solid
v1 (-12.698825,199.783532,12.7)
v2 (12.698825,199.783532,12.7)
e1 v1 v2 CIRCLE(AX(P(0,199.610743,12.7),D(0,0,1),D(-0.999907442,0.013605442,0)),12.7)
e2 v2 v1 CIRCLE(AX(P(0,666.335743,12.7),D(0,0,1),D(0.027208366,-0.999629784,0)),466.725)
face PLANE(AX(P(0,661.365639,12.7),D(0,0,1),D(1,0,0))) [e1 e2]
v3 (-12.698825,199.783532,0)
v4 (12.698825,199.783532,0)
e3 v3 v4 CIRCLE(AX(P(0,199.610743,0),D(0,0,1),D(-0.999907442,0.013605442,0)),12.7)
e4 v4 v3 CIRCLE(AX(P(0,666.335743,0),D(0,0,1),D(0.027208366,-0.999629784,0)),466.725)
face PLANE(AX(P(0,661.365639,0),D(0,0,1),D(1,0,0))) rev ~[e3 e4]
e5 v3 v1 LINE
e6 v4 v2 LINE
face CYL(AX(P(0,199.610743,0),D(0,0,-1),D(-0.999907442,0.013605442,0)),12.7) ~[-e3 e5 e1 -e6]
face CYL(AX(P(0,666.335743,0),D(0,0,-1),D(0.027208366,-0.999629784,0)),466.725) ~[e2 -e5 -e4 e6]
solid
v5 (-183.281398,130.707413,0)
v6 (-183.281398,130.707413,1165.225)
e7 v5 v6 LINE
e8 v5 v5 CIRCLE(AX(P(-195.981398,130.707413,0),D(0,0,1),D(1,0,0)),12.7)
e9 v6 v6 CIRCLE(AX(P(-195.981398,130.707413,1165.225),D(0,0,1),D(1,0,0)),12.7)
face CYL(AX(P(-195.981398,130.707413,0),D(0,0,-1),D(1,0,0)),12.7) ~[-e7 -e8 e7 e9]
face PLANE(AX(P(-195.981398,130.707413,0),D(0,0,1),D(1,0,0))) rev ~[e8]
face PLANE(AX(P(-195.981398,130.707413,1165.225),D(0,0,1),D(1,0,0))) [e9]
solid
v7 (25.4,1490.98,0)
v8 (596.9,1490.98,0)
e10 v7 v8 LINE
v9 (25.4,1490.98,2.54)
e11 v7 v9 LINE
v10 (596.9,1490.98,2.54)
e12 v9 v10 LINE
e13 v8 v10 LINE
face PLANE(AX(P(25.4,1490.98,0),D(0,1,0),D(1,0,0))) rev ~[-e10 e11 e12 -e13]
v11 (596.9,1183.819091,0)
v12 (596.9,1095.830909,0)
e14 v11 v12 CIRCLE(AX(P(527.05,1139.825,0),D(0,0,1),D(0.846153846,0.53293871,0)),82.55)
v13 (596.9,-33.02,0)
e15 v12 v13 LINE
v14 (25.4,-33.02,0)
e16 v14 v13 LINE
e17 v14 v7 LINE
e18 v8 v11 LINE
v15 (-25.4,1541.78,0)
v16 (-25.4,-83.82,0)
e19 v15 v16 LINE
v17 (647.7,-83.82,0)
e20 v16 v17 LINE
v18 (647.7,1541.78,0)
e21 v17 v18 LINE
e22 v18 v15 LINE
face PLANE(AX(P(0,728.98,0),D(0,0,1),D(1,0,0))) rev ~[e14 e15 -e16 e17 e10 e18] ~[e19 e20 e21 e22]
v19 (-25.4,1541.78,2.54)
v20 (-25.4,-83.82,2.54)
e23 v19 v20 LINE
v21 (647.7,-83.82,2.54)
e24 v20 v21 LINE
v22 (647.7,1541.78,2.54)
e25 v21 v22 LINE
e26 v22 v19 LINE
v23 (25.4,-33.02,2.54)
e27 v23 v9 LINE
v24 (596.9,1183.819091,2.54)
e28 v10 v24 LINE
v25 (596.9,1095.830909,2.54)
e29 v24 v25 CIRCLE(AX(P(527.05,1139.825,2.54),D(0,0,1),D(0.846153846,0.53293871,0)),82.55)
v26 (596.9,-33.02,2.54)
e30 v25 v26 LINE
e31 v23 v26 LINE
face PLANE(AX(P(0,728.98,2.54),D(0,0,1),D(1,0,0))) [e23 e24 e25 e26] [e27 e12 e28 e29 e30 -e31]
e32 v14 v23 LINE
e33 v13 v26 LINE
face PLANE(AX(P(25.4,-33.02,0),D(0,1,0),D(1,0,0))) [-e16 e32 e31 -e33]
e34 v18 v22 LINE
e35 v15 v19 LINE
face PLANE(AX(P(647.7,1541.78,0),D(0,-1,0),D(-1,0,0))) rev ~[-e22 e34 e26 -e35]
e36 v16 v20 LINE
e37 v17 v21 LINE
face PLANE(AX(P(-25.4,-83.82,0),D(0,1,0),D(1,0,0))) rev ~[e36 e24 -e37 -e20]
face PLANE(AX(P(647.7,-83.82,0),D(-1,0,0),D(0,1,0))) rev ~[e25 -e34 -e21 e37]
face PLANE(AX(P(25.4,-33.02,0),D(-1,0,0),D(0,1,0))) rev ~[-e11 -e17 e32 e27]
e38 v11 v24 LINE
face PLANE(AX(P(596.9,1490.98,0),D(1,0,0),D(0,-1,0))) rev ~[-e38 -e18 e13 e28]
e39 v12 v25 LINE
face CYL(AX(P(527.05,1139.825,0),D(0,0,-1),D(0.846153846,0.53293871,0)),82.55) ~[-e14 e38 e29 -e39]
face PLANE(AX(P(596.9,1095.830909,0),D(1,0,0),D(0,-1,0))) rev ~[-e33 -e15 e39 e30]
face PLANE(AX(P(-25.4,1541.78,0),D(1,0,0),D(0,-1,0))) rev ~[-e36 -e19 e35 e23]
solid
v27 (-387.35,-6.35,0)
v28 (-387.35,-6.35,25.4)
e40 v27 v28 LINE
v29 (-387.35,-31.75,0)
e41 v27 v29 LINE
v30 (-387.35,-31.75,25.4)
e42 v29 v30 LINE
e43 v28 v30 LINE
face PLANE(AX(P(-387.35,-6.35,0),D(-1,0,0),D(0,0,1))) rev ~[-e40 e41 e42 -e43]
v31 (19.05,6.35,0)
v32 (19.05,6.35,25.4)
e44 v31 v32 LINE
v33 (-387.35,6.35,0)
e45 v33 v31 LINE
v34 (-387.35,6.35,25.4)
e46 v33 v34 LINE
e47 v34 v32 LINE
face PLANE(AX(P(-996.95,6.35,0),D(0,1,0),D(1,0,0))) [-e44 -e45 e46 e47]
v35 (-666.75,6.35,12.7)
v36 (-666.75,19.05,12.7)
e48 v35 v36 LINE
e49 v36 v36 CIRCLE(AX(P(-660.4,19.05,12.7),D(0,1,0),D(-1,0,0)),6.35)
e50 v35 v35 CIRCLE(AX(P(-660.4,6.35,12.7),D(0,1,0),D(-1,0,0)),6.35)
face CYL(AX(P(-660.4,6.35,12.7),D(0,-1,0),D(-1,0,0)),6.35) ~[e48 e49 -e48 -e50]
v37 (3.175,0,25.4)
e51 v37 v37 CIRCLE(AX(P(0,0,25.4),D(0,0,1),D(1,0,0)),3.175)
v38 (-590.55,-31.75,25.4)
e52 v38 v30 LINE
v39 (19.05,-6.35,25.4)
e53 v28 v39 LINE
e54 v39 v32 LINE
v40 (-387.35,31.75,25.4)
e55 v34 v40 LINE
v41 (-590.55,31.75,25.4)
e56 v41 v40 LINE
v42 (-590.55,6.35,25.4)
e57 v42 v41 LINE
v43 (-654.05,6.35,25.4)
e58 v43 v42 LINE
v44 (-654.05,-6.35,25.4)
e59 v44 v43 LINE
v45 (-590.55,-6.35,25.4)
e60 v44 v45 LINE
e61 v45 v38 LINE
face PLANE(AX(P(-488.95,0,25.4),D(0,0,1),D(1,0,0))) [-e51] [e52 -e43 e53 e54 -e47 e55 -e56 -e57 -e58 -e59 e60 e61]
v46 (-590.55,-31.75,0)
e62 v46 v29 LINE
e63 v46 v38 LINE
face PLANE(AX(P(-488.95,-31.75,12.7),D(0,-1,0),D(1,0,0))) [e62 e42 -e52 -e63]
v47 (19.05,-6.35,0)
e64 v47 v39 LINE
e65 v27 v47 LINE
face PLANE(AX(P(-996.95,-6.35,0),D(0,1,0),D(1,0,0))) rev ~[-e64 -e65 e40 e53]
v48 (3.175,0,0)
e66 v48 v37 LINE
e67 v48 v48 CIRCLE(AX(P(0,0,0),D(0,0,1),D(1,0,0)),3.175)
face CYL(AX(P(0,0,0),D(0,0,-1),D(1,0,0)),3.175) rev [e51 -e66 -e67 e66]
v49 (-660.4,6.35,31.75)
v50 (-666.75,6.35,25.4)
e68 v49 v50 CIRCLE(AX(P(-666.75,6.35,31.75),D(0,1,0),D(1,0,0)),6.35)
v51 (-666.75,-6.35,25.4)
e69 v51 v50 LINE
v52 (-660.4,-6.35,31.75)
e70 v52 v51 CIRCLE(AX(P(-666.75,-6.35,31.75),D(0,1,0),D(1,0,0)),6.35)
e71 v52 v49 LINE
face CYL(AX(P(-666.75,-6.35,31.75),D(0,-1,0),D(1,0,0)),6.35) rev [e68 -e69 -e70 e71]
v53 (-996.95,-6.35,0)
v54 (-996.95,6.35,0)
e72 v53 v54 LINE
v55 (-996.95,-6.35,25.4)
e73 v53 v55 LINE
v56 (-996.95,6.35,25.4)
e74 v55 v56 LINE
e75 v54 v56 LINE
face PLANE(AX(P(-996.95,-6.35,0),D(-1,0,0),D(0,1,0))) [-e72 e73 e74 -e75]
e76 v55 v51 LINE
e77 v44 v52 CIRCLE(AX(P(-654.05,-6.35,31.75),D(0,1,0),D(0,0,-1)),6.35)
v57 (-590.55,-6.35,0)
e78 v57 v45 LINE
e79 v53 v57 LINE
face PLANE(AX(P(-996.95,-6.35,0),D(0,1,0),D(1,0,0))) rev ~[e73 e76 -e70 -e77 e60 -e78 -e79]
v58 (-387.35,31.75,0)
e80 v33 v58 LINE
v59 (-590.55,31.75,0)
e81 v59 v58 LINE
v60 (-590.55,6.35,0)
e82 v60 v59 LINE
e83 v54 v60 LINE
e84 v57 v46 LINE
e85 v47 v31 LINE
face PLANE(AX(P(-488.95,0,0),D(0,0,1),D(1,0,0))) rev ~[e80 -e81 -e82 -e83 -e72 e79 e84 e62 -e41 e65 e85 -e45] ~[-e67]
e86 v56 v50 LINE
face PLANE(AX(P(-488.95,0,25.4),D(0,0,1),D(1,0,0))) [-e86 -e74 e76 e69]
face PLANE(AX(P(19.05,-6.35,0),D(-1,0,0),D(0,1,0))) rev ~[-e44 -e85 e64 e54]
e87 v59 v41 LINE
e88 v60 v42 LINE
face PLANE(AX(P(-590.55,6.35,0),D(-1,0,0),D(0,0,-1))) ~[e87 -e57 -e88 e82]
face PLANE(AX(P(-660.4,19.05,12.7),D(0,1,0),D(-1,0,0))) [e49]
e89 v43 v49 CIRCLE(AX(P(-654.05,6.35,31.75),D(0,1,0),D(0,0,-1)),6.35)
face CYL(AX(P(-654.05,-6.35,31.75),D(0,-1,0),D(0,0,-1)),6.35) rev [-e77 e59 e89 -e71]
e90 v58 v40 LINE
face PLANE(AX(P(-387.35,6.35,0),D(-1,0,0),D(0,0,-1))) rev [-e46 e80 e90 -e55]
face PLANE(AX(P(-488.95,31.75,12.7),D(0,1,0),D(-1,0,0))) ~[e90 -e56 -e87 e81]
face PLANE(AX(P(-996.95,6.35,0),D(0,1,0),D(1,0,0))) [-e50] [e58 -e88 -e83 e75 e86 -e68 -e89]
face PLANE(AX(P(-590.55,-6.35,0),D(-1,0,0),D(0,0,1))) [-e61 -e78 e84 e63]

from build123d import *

# Parameters (mm, degrees)
F0_W      = 1016
F0_H      = 12.7
F0_R      = 3.175
F1_DEPTH  = 25.4
F2_R      = 6.35
F3_DEPTH  = 12.7
F5_DEPTH  = 12.7
F6_R      = 12.7
F7_DEPTH  = 1165.225
F9_DEPTH  = 12.7
F10_W     = 203.2
F10_H     = 25.4
F11_DEPTH = 25.4
F12_W     = 571.5
F12_H     = 50.8
F13_DEPTH = 2.54


# Not quite as in the source:
# - a pattern or mirror of a feature is missing from the dataset's text; its kind, count and spacing are read off the source's solid


with BuildPart() as f1:
    # F0 (on Top) → F1 (new body)
    with BuildSketch(Plane.XY):
        with Locations((-488.95, 0)):
            Rectangle(F0_W, F0_H)
        Circle(F0_R, mode=Mode.SUBTRACT)
    extrude(amount=F1_DEPTH)

    # F2 (on face) → F3 (join)
    with BuildSketch(Plane(origin=(0, 6.35, 0), x_dir=(-1, 0, 0), z_dir=(0, 1, 0))):
        with Locations((660.4, 12.7)):
            Circle(F2_R)
    extrude(amount=F3_DEPTH)

    # F8 (on face) → F9 (join)
    with BuildSketch(Plane.XZ.offset(6.35)):
        with BuildLine():
            ThreePointArc((-660.4, 31.75), (-662.2598719395, 27.2598719395), (-666.75, 25.4))
            Line((-666.75, 25.4), (-654.05, 25.4))
            ThreePointArc((-654.05, 25.4), (-658.5401280605, 27.2598719395), (-660.4, 31.75))
        make_face()
    extrude(amount=-F9_DEPTH)

    # F10 (on face) → F11 (join)
    with BuildSketch(Plane.XZ.offset(6.35)):
        with Locations((-488.95, 12.7)):
            Rectangle(F10_W, F10_H)
    f11 = extrude(amount=F11_DEPTH)

    # F11_copies: F11 across plane
    add(f11.mirror(Plane.ZX))


with BuildPart() as f5:
    # F4 (on Top) → F5 (new body)
    with BuildSketch(Plane.XY):
        with BuildLine():
            ThreePointArc((-12.6988245094, 199.7835319932), (0, 186.9107428776), (12.6988245094, 199.7835319932))
            ThreePointArc((12.6988245094, 199.7835319932), (0, 1133.0607428776), (-12.6988245094, 199.7835319932))
        make_face()
    extrude(amount=F5_DEPTH)


with BuildPart() as f7:
    # F6 (on Top) → F7 (new body)
    with BuildSketch(Plane.XY):
        with Locations((-195.9813982248, 130.7074129581)):
            Circle(F6_R)
    extrude(amount=F7_DEPTH)


with BuildPart() as f13:
    # F12 (on Top) → F13 (new body)
    with BuildSketch(Plane.XY):
        Polygon((-25.4, -83.82), (25.4, -83.82), (25.4, -33.02), (25.4, 1490.98), (25.4, 1541.78), (-25.4, 1541.78), align=None)
        with Locations((311.15, 1516.38)):
            Rectangle(F12_W, F12_H)
        with BuildLine():
            Line((596.9, -33.02), (596.9, -83.82))
            Line((596.9, -83.82), (647.7, -83.82))
            Line((647.7, -83.82), (647.7, 1541.78))
            Line((647.7, 1541.78), (596.9, 1541.78))
            Line((596.9, 1541.78), (596.9, 1490.98))
            Line((596.9, 1490.98), (596.9, 1183.8190905123))
            ThreePointArc((596.9, 1183.8190905123), (606.3614745797, 1162.7202505992), (609.6, 1139.825))
            ThreePointArc((609.6, 1139.825), (606.3614745797, 1116.9297494008), (596.9, 1095.8309094877))
            Line((596.9, 1095.8309094877), (596.9, -33.02))
        make_face()
        with BuildLine():
            ThreePointArc((596.9, 1183.8190905123), (444.5, 1139.825), (596.9, 1095.8309094877))
            Line((596.9, 1095.8309094877), (596.9, 1183.8190905123))
        make_face()
        with BuildLine():
            Line((596.9, 1183.8190905123), (596.9, 1095.8309094877))
            ThreePointArc((596.9, 1095.8309094877), (606.3614745797, 1116.9297494008), (609.6, 1139.825))
            ThreePointArc((609.6, 1139.825), (606.3614745797, 1162.7202505992), (596.9, 1183.8190905123))
        make_face()
        with Locations((311.15, -58.42)):
            Rectangle(F12_W, F12_H)
    extrude(amount=F13_DEPTH)


solid = Compound([f1.part, f5.part, f7.part, f13.part])
